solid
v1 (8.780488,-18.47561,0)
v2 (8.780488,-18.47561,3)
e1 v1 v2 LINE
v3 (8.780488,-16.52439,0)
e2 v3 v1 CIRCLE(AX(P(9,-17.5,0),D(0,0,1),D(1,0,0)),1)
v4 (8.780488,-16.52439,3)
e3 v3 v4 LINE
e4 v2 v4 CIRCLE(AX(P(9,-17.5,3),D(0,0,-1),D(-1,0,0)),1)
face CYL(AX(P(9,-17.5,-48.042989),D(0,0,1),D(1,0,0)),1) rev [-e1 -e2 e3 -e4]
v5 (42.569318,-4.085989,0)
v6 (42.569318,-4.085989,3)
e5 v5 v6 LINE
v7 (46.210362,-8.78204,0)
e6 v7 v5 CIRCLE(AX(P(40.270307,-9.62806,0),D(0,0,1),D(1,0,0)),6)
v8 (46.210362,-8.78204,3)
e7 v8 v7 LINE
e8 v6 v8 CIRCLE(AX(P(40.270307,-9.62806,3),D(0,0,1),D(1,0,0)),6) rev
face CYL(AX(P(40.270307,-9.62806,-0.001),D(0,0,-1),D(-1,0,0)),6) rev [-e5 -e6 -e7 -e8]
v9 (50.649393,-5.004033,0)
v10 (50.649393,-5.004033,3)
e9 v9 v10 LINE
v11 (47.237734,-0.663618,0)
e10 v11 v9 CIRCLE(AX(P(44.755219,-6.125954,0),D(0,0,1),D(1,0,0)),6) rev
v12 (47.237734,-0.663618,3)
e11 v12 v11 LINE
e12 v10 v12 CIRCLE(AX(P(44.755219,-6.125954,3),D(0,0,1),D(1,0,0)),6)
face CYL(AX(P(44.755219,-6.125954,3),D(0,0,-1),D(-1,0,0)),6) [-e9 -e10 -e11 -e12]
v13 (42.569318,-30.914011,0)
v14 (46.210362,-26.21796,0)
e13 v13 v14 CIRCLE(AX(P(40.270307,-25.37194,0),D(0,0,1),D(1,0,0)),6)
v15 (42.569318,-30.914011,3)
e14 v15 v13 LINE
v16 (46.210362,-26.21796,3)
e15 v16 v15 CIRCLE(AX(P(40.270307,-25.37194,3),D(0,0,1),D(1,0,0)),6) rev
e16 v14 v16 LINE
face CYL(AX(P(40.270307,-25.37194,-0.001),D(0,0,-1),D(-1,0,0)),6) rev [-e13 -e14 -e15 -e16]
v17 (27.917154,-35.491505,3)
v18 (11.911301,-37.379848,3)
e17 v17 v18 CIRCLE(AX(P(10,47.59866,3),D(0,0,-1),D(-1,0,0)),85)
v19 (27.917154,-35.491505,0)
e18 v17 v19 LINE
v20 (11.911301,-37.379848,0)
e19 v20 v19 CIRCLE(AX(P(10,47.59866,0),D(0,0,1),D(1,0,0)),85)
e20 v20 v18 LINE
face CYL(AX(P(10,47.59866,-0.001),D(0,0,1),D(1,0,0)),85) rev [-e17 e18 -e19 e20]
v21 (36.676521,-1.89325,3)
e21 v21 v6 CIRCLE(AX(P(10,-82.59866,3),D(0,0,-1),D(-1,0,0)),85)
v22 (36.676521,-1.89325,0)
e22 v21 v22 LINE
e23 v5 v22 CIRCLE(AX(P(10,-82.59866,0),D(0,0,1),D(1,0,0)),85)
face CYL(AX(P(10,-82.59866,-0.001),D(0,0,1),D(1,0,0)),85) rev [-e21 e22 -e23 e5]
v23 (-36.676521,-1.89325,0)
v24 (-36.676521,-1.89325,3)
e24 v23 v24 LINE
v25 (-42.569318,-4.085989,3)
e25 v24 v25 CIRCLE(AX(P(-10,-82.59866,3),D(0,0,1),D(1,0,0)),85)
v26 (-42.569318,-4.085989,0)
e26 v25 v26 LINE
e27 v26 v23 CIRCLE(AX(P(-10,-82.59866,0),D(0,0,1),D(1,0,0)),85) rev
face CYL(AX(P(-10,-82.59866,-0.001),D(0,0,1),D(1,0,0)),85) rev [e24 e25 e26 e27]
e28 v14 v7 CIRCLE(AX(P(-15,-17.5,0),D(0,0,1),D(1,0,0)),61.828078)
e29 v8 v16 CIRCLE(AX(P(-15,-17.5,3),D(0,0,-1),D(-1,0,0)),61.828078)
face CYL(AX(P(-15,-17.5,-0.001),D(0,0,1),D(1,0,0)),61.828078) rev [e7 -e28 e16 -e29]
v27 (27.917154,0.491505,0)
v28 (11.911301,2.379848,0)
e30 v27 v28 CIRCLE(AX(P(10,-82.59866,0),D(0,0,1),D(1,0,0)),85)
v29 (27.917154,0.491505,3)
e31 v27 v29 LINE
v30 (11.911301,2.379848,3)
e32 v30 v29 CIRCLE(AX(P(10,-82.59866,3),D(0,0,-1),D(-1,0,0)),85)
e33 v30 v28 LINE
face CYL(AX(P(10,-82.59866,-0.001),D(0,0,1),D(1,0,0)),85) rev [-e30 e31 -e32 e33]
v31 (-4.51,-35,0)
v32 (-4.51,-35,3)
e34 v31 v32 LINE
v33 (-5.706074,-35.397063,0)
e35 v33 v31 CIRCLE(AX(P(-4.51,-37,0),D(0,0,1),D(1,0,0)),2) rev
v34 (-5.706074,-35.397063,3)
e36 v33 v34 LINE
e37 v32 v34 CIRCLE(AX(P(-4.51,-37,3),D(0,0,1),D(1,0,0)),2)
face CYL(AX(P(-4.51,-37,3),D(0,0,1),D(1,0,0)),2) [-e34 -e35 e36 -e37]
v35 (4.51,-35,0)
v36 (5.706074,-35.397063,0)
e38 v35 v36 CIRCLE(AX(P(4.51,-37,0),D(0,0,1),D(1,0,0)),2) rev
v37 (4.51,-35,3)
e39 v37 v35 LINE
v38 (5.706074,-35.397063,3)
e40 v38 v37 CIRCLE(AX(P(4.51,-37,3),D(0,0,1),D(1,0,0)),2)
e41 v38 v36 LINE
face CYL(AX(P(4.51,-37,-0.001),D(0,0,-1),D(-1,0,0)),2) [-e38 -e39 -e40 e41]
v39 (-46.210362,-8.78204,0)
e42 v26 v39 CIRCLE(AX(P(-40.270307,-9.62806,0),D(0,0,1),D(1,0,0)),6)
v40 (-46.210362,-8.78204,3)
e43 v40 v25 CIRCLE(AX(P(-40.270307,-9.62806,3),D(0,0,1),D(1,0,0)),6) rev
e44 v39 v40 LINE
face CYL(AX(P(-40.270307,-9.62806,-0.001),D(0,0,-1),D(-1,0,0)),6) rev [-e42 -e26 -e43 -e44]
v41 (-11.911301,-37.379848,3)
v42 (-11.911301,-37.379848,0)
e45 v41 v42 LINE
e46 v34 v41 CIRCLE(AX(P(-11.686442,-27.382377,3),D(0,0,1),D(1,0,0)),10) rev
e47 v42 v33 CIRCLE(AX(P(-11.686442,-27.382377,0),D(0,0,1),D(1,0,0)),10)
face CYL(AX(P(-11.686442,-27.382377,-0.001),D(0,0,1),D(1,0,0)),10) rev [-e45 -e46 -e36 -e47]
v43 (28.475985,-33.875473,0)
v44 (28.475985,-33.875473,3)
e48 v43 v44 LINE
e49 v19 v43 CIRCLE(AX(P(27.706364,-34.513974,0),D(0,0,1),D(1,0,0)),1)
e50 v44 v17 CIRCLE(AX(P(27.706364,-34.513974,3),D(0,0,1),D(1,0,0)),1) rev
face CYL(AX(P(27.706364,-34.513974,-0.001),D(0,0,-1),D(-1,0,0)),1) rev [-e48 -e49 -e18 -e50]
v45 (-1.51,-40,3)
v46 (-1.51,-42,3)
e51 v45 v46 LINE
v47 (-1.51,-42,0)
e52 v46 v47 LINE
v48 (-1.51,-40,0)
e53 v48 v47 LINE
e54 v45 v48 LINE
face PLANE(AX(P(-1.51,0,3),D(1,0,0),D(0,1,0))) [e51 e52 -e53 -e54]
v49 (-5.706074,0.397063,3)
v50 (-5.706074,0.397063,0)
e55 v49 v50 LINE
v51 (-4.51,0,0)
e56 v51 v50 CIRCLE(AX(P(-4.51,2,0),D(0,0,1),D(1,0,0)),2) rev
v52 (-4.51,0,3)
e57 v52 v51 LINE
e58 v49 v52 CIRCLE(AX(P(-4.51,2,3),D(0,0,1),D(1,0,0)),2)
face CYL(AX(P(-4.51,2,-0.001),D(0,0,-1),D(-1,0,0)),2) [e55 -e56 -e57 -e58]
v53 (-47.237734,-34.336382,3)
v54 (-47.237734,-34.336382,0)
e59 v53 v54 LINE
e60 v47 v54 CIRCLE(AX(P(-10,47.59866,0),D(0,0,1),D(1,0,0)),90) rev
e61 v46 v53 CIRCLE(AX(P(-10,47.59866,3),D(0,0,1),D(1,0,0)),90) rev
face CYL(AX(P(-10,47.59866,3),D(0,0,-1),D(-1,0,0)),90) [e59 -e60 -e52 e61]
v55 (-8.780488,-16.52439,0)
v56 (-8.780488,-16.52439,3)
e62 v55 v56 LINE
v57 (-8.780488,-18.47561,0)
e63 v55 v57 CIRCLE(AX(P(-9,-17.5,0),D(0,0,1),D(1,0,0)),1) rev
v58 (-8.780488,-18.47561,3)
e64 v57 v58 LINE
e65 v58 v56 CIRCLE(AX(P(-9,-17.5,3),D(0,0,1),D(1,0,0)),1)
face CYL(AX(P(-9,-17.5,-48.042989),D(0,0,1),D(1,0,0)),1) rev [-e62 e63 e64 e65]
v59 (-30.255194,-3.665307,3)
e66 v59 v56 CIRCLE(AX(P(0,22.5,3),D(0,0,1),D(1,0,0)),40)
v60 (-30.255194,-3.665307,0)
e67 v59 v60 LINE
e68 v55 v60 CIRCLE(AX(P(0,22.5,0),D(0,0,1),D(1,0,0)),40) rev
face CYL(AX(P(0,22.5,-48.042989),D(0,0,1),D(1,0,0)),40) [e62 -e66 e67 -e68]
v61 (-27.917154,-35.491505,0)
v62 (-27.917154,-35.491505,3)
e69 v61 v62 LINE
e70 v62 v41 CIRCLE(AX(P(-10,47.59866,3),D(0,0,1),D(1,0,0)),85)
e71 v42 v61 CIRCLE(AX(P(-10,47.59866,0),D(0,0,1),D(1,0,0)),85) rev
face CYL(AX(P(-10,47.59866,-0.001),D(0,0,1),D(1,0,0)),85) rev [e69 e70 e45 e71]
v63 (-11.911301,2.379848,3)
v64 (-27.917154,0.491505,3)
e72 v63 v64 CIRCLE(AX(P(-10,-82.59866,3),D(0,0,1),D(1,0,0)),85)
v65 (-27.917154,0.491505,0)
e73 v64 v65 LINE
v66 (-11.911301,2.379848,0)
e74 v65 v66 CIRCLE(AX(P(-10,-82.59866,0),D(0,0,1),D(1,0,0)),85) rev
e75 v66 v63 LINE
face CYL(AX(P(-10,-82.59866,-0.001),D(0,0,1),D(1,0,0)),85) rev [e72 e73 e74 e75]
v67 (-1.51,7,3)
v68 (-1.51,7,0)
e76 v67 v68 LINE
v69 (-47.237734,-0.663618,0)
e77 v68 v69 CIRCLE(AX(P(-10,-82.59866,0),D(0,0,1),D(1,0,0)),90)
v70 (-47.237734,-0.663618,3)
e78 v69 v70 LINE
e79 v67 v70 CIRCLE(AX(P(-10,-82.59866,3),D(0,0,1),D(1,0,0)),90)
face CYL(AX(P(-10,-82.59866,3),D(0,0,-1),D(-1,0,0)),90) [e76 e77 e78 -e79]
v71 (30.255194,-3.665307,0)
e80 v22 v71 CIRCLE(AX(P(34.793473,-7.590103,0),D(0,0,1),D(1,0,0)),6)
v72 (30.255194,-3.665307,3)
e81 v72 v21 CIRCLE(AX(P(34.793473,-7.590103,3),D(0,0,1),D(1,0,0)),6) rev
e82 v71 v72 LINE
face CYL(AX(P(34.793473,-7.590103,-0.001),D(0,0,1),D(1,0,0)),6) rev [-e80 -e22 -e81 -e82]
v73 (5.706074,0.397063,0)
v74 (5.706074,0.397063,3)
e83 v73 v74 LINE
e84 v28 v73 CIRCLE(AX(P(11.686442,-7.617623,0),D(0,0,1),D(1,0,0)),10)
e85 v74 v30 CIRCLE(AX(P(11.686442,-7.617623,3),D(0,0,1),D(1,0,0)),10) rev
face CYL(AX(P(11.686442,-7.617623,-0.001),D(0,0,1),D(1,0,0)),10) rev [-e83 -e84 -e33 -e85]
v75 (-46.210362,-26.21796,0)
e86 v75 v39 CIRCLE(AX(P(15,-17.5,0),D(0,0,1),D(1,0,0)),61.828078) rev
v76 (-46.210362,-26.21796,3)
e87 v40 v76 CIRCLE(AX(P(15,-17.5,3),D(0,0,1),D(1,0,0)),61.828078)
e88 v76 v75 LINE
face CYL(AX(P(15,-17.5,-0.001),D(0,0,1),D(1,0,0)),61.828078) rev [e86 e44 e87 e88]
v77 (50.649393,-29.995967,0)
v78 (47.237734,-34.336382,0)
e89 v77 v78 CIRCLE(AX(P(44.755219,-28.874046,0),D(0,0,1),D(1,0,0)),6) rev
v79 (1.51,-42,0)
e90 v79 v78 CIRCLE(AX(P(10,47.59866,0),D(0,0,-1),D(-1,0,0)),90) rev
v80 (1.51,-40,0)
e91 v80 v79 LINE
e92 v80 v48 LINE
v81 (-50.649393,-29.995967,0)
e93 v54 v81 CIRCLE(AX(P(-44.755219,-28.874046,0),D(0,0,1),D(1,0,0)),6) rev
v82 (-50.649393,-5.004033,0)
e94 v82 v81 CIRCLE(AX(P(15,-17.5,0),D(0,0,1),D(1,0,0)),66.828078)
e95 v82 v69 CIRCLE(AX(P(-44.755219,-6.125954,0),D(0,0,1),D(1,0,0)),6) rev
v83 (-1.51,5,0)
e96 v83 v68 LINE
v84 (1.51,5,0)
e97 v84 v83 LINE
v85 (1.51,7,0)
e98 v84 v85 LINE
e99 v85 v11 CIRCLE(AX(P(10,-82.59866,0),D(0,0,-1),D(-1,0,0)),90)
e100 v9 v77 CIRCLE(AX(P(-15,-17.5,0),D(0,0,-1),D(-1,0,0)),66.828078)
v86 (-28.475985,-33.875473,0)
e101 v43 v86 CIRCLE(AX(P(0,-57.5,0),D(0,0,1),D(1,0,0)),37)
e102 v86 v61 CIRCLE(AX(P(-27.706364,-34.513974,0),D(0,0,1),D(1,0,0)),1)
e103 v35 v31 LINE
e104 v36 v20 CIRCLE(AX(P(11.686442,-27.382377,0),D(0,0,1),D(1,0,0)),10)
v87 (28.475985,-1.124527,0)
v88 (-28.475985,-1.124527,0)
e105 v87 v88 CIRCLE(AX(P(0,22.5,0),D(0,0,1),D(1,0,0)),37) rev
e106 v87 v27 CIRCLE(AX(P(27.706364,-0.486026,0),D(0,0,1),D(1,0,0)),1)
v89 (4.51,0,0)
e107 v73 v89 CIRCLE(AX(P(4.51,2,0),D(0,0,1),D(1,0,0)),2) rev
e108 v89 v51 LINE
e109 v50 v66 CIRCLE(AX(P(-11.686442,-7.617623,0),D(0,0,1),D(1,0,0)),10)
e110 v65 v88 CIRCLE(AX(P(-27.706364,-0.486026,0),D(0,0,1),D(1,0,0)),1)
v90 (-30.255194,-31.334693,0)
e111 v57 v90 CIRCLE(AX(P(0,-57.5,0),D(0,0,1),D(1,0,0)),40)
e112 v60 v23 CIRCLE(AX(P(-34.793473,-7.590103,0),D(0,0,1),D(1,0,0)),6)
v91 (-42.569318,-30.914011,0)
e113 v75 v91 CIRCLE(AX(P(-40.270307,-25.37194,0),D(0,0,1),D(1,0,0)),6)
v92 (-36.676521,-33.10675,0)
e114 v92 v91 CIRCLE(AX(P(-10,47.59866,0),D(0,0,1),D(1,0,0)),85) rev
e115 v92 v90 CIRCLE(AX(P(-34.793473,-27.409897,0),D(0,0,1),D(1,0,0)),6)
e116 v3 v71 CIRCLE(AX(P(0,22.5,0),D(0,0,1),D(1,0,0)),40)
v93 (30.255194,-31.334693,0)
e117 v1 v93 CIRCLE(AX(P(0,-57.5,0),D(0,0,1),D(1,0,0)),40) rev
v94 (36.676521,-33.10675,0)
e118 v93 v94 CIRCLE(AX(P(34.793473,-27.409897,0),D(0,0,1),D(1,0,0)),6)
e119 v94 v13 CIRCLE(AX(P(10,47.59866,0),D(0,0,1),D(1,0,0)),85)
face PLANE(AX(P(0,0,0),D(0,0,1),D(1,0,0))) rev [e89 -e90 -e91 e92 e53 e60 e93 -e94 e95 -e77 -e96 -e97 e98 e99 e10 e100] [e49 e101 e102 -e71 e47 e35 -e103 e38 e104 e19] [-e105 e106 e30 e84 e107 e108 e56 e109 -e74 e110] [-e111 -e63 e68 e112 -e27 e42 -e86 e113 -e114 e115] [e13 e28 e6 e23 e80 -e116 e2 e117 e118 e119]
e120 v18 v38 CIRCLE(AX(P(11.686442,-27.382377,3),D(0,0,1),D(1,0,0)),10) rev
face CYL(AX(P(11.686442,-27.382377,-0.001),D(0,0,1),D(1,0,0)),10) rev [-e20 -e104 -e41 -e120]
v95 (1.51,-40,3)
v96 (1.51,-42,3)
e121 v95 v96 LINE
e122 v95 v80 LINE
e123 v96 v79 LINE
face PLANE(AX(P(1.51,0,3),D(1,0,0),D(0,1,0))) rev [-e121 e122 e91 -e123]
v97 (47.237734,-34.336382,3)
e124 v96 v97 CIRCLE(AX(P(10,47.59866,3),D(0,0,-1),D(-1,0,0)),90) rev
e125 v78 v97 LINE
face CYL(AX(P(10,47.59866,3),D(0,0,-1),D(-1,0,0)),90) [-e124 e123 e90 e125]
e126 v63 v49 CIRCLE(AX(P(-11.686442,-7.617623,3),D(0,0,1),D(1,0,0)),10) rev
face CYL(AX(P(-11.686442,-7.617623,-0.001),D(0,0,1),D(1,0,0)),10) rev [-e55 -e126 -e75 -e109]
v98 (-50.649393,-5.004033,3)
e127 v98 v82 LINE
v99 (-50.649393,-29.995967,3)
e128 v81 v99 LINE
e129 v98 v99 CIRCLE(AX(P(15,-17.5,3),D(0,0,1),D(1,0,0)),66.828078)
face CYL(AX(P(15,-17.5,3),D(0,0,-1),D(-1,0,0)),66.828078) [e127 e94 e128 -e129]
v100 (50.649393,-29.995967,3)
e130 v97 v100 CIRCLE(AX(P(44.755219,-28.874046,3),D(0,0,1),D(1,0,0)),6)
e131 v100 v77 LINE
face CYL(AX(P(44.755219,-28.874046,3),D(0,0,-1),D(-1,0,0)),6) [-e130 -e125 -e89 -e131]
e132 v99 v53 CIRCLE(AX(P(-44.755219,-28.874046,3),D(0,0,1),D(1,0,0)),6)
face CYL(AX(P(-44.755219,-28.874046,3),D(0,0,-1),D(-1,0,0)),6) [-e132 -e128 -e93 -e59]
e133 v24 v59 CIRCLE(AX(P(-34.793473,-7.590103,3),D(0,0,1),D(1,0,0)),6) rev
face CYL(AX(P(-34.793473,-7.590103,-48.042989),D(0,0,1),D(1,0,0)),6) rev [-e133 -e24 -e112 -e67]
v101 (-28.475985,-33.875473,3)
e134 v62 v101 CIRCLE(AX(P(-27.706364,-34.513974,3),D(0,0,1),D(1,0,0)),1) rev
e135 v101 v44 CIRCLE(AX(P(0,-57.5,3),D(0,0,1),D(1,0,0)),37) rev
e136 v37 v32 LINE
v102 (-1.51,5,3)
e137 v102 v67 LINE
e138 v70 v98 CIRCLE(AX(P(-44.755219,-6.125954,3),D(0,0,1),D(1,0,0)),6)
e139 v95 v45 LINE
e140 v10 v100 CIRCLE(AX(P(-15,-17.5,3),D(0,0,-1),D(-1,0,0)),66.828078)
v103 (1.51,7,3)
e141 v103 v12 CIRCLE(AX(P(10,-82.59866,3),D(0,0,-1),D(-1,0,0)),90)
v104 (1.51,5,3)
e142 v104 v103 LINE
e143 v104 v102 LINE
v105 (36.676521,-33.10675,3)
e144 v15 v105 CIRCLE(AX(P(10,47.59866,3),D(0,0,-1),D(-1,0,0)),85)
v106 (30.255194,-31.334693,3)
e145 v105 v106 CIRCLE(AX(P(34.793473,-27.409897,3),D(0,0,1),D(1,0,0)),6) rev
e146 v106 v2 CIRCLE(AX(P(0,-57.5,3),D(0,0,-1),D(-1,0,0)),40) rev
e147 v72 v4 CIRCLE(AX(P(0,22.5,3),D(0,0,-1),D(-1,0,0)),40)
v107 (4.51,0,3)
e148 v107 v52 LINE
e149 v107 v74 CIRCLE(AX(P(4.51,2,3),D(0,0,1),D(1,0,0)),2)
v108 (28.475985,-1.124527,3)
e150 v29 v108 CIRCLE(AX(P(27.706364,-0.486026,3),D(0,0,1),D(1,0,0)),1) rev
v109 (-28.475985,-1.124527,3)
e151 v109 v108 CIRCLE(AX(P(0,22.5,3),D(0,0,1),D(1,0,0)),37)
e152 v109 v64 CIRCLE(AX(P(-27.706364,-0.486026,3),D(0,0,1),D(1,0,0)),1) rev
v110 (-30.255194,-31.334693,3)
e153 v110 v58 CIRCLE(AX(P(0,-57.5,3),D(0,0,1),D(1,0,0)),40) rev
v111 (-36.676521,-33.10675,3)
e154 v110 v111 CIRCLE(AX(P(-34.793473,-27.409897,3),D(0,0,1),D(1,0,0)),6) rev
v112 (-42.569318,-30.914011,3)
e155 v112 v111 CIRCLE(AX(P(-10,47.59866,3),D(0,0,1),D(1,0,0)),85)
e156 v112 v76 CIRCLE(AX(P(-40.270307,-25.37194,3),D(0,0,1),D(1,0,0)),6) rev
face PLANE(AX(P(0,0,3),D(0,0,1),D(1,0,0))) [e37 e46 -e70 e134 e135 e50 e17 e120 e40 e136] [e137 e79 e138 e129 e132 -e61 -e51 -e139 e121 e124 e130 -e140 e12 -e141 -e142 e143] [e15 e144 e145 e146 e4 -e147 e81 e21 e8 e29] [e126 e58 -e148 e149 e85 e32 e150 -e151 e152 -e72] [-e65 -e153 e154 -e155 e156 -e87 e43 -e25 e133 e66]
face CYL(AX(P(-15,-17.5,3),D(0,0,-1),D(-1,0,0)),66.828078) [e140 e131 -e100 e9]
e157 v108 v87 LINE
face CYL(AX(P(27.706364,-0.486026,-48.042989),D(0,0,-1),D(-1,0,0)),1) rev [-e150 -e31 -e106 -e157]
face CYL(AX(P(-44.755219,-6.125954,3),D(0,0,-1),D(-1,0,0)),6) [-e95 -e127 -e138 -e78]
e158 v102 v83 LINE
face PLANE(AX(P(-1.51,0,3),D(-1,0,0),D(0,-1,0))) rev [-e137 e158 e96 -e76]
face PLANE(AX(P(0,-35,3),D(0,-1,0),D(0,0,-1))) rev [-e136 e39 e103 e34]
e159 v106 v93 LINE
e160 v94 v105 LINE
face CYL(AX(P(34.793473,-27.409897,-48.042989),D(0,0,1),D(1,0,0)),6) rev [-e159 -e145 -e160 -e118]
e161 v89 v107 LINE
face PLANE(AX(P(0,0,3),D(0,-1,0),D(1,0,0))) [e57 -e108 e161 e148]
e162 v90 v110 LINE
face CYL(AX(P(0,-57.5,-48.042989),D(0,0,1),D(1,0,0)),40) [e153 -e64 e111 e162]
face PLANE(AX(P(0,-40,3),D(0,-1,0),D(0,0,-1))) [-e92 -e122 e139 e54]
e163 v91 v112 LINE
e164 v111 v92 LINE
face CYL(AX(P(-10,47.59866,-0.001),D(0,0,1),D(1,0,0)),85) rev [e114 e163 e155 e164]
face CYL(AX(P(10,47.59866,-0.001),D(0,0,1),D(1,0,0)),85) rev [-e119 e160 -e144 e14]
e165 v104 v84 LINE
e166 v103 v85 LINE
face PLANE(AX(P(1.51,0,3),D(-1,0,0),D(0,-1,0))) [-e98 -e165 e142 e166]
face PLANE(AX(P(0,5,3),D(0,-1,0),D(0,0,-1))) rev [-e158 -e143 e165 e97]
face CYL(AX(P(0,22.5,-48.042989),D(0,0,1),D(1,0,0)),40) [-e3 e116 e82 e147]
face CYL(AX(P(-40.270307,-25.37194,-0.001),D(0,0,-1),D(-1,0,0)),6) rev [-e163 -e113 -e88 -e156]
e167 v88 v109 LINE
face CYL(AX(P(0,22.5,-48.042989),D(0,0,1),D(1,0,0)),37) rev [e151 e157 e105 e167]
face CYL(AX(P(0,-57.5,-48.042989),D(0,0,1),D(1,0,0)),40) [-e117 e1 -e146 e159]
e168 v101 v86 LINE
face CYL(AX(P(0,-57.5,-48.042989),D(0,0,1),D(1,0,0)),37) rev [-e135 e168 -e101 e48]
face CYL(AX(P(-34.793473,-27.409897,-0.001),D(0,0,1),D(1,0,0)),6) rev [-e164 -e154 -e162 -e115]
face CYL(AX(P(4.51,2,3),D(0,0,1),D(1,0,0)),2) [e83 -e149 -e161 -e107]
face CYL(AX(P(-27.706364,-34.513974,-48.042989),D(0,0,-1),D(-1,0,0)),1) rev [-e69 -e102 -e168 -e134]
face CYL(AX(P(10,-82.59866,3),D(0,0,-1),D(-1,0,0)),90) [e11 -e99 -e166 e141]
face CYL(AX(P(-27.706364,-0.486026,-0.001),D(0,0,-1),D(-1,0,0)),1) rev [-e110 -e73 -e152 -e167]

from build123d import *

# Parameters (mm, degrees)
BOSS_EXTRUDE1_DEPTH = 3
CUT_EXTRUDE1_REACH  = 69.03
SKETCH2_W           = 5
SKETCH2_H           = 35
BOSS_EXTRUDE8_DEPTH = 3
MIRROR1_DEPTH       = 3
FILLET1_R           = 2
FILLET2_R           = 10
FILLET3_R           = 6
FILLET4_R           = 1


# Read off the part's stored shape, not the designer's step: Mirror1
with BuildPart() as part:
    # Sketch1 → Boss-Extrude1 (new body)
    with BuildSketch(Plane.XY):
        with BuildLine():
            Line((-1.51, 0), (0, 0))
            Line((0, 0), (0, 5))
            Line((0, 5), (-1.51, 5))
            Line((-1.51, 5), (-1.51, 7))
            ThreePointArc((-1.51, 7), (-26.381774629, 5.897879108), (-50, -1.976082663))
            ThreePointArc((-50, -1.976082663), (-51.828078002, -17.5), (-50, -33.023917337))
            ThreePointArc((-50, -33.023917337), (-26.381774629, -40.897879108), (-1.51, -42))
            Line((-1.51, -42), (-1.51, -40))
            Line((-1.51, -40), (0, -40))
            Line((0, -40), (0, -35))
            Line((0, -35), (-1.51, -35))
            Line((-1.51, -35), (-1.51, -33))
            Line((-1.51, -33), (-1.51, -2))
            Line((-1.51, -2), (-1.51, 0))
        make_face()
    extrude(amount=BOSS_EXTRUDE1_DEPTH)

    # Sketch2 → Cut-Extrude1 (cut, up to next)
    with BuildSketch(Plane.XY.offset(3), mode=Mode.PRIVATE) as cut_extrude1_sk1:
        with BuildLine():
            ThreePointArc((-45.638636542, -5.430742036), (-46.828078002, -17.5), (-45.638636542, -29.569257964))
            ThreePointArc((-45.638636542, -29.569257964), (-26.536011476, -35.777357536), (-6.51, -37.329661985))
            Line((-6.51, -37.329661985), (-6.51, 2.329661985))
            ThreePointArc((-6.51, 2.329661985), (-26.536011476, 0.777357536), (-45.638636542, -5.430742036))
        make_face()
    cut_extrude1_tool1 = extrude(cut_extrude1_sk1.sketch, amount=-CUT_EXTRUDE1_REACH, mode=Mode.PRIVATE) & part.part
    # Sketch2 → Cut-Extrude1 (cut, up to next)
    with BuildSketch(Plane.XY.offset(3), mode=Mode.PRIVATE) as cut_extrude1_sk2:
        with Locations((-4.01, -17.5)):
            Rectangle(SKETCH2_W, SKETCH2_H)
    cut_extrude1_tool2 = extrude(cut_extrude1_sk2.sketch, amount=-CUT_EXTRUDE1_REACH, mode=Mode.PRIVATE) & part.part
    add(cut_extrude1_tool1.solids().sort_by_distance((-24.946194, -17.5, 3))[0], mode=Mode.SUBTRACT)
    add(cut_extrude1_tool2.solids().sort_by_distance((-4.01, -17.5, 3))[0], mode=Mode.SUBTRACT)

    # Sketch3 → Boss-Extrude8 (add)
    with BuildSketch(Plane.XY.offset(3)):
        with BuildLine():
            ThreePointArc((-32.612027687, -34.338487741), (-31.049231117, -34.753813219), (-29.478816537, -35.139334187))
            ThreePointArc((-29.478816537, -35.139334187), (-16.456843028, -24.361316901), (0, -20.5))
            Line((0, -20.5), (0, -14.5))
            ThreePointArc((0, -14.5), (-16.456843028, -10.638683099), (-29.478816537, 0.139334187))
            ThreePointArc((-29.478816537, 0.139334187), (-31.049231117, -0.246186781), (-32.612027687, -0.661512259))
            ThreePointArc((-32.612027687, -0.661512259), (-22.163998061, -10.798005795), (-8.780487851, -16.524390234))
            ThreePointArc((-8.780487851, -16.524390234), (-8, -17.499999784), (-8.780487429, -18.475609671))
            ThreePointArc((-8.780487429, -18.475609671), (-22.163997881, -24.201994085), (-32.612027687, -34.338487741))
        make_face()
    extrude(amount=-BOSS_EXTRUDE8_DEPTH)

    # Mirror1 outline → Mirror1 (add)
    with BuildSketch(Plane.XY):
        with BuildLine():
            ThreePointArc((29.478816537, -35.139334187), (18.069073524, -37.017473377), (6.51, -37.329661985))
            Line((6.51, -37.329661985), (6.51, -35))
            Line((6.51, -35), (0, -35))
            Line((0, -35), (0, -40))
            Line((0, -40), (1.51, -40))
            Line((1.51, -40), (1.51, -42))
            ThreePointArc((1.51, -42), (26.381774629, -40.897879108), (50, -33.023917337))
            ThreePointArc((50, -33.023917337), (51.828078002, -17.5), (50, -1.976082663))
            ThreePointArc((50, -1.976082663), (26.381774629, 5.897879108), (1.51, 7))
            Line((1.51, 7), (1.51, 5))
            Line((1.51, 5), (0, 5))
            Line((0, 5), (0, 0))
            Line((0, 0), (6.51, 0))
            Line((6.51, 0), (6.51, 2.329661985))
            ThreePointArc((6.51, 2.329661985), (18.069073524, 2.017473377), (29.478816537, 0.139334187))
            ThreePointArc((29.478816537, 0.139334187), (16.456843029, -10.638683099), (0, -14.5))
            Line((0, -14.5), (0, -20.5))
            ThreePointArc((0, -20.5), (16.456843029, -24.361316901), (29.478816537, -35.139334187))
        make_face()
        with BuildLine():
            ThreePointArc((45.638636542, -29.569257964), (39.22278835, -32.220063478), (32.612027687, -34.338487741))
            ThreePointArc((32.612027687, -34.338487741), (22.163998041, -24.201994192), (8.780487805, -18.475609756))
            ThreePointArc((8.780487805, -18.475609756), (8, -17.5), (8.780487805, -16.524390244))
            ThreePointArc((8.780487805, -16.524390244), (22.163998041, -10.798005808), (32.612027687, -0.661512259))
            ThreePointArc((32.612027687, -0.661512259), (39.22278835, -2.779936522), (45.638636542, -5.430742036))
            ThreePointArc((45.638636542, -5.430742036), (46.828078002, -17.5), (45.638636542, -29.569257964))
        make_face(mode=Mode.SUBTRACT)
    extrude(amount=MIRROR1_DEPTH)

    # Fillet1
    fillet1_edges = [part.edges().sort_by_distance(p)[0] for p in [
        (6.51, -35, 1.5),
        (6.51, 0, 1.5),
        (-6.51, 0, 1.5),
        (-6.51, -35, 1.5),
    ]]
    fillet(fillet1_edges, radius=FILLET1_R)

    # Fillet2
    fillet2_edges = [part.edges().sort_by_distance(p)[0] for p in [
        (-6.51, 2.329661985, 1.5),
        (6.51, 2.329661985, 1.5),
        (6.51, -37.329661985, 1.5),
        (-6.51, -37.329661985, 1.5),
    ]]
    fillet(fillet2_edges, radius=FILLET2_R)

    # Fillet3
    fillet3_edges = [part.edges().sort_by_distance(p)[0] for p in [
        (45.638636542, -5.430742036, 1.5),
        (45.638636542, -29.569257964, 1.5),
        (32.612027687, -0.661512259, 1.5),
        (32.612027687, -34.338487741, 1.5),
        (-50, -33.023917337, 1.5),
        (-50, -1.976082663, 1.5),
        (-45.638636542, -29.569257964, 1.5),
        (-45.638636542, -5.430742036, 1.5),
        (-32.612027687, -0.661512259, 1.5),
        (-32.612027687, -34.338487741, 1.5),
        (50, -1.976082663, 1.5),
        (50, -33.023917337, 1.5),
    ]]
    fillet(fillet3_edges, radius=FILLET3_R)

    # Fillet4
    fillet4_edges = [part.edges().sort_by_distance(p)[0] for p in [
        (29.478816537, 0.139334187, 1.5),
        (29.478816537, -35.139334187, 1.5),
        (-29.478816537, -35.139334187, 1.5),
        (-29.478816537, 0.139334187, 1.5),
    ]]
    fillet(fillet4_edges, radius=FILLET4_R)


solid = part.part
